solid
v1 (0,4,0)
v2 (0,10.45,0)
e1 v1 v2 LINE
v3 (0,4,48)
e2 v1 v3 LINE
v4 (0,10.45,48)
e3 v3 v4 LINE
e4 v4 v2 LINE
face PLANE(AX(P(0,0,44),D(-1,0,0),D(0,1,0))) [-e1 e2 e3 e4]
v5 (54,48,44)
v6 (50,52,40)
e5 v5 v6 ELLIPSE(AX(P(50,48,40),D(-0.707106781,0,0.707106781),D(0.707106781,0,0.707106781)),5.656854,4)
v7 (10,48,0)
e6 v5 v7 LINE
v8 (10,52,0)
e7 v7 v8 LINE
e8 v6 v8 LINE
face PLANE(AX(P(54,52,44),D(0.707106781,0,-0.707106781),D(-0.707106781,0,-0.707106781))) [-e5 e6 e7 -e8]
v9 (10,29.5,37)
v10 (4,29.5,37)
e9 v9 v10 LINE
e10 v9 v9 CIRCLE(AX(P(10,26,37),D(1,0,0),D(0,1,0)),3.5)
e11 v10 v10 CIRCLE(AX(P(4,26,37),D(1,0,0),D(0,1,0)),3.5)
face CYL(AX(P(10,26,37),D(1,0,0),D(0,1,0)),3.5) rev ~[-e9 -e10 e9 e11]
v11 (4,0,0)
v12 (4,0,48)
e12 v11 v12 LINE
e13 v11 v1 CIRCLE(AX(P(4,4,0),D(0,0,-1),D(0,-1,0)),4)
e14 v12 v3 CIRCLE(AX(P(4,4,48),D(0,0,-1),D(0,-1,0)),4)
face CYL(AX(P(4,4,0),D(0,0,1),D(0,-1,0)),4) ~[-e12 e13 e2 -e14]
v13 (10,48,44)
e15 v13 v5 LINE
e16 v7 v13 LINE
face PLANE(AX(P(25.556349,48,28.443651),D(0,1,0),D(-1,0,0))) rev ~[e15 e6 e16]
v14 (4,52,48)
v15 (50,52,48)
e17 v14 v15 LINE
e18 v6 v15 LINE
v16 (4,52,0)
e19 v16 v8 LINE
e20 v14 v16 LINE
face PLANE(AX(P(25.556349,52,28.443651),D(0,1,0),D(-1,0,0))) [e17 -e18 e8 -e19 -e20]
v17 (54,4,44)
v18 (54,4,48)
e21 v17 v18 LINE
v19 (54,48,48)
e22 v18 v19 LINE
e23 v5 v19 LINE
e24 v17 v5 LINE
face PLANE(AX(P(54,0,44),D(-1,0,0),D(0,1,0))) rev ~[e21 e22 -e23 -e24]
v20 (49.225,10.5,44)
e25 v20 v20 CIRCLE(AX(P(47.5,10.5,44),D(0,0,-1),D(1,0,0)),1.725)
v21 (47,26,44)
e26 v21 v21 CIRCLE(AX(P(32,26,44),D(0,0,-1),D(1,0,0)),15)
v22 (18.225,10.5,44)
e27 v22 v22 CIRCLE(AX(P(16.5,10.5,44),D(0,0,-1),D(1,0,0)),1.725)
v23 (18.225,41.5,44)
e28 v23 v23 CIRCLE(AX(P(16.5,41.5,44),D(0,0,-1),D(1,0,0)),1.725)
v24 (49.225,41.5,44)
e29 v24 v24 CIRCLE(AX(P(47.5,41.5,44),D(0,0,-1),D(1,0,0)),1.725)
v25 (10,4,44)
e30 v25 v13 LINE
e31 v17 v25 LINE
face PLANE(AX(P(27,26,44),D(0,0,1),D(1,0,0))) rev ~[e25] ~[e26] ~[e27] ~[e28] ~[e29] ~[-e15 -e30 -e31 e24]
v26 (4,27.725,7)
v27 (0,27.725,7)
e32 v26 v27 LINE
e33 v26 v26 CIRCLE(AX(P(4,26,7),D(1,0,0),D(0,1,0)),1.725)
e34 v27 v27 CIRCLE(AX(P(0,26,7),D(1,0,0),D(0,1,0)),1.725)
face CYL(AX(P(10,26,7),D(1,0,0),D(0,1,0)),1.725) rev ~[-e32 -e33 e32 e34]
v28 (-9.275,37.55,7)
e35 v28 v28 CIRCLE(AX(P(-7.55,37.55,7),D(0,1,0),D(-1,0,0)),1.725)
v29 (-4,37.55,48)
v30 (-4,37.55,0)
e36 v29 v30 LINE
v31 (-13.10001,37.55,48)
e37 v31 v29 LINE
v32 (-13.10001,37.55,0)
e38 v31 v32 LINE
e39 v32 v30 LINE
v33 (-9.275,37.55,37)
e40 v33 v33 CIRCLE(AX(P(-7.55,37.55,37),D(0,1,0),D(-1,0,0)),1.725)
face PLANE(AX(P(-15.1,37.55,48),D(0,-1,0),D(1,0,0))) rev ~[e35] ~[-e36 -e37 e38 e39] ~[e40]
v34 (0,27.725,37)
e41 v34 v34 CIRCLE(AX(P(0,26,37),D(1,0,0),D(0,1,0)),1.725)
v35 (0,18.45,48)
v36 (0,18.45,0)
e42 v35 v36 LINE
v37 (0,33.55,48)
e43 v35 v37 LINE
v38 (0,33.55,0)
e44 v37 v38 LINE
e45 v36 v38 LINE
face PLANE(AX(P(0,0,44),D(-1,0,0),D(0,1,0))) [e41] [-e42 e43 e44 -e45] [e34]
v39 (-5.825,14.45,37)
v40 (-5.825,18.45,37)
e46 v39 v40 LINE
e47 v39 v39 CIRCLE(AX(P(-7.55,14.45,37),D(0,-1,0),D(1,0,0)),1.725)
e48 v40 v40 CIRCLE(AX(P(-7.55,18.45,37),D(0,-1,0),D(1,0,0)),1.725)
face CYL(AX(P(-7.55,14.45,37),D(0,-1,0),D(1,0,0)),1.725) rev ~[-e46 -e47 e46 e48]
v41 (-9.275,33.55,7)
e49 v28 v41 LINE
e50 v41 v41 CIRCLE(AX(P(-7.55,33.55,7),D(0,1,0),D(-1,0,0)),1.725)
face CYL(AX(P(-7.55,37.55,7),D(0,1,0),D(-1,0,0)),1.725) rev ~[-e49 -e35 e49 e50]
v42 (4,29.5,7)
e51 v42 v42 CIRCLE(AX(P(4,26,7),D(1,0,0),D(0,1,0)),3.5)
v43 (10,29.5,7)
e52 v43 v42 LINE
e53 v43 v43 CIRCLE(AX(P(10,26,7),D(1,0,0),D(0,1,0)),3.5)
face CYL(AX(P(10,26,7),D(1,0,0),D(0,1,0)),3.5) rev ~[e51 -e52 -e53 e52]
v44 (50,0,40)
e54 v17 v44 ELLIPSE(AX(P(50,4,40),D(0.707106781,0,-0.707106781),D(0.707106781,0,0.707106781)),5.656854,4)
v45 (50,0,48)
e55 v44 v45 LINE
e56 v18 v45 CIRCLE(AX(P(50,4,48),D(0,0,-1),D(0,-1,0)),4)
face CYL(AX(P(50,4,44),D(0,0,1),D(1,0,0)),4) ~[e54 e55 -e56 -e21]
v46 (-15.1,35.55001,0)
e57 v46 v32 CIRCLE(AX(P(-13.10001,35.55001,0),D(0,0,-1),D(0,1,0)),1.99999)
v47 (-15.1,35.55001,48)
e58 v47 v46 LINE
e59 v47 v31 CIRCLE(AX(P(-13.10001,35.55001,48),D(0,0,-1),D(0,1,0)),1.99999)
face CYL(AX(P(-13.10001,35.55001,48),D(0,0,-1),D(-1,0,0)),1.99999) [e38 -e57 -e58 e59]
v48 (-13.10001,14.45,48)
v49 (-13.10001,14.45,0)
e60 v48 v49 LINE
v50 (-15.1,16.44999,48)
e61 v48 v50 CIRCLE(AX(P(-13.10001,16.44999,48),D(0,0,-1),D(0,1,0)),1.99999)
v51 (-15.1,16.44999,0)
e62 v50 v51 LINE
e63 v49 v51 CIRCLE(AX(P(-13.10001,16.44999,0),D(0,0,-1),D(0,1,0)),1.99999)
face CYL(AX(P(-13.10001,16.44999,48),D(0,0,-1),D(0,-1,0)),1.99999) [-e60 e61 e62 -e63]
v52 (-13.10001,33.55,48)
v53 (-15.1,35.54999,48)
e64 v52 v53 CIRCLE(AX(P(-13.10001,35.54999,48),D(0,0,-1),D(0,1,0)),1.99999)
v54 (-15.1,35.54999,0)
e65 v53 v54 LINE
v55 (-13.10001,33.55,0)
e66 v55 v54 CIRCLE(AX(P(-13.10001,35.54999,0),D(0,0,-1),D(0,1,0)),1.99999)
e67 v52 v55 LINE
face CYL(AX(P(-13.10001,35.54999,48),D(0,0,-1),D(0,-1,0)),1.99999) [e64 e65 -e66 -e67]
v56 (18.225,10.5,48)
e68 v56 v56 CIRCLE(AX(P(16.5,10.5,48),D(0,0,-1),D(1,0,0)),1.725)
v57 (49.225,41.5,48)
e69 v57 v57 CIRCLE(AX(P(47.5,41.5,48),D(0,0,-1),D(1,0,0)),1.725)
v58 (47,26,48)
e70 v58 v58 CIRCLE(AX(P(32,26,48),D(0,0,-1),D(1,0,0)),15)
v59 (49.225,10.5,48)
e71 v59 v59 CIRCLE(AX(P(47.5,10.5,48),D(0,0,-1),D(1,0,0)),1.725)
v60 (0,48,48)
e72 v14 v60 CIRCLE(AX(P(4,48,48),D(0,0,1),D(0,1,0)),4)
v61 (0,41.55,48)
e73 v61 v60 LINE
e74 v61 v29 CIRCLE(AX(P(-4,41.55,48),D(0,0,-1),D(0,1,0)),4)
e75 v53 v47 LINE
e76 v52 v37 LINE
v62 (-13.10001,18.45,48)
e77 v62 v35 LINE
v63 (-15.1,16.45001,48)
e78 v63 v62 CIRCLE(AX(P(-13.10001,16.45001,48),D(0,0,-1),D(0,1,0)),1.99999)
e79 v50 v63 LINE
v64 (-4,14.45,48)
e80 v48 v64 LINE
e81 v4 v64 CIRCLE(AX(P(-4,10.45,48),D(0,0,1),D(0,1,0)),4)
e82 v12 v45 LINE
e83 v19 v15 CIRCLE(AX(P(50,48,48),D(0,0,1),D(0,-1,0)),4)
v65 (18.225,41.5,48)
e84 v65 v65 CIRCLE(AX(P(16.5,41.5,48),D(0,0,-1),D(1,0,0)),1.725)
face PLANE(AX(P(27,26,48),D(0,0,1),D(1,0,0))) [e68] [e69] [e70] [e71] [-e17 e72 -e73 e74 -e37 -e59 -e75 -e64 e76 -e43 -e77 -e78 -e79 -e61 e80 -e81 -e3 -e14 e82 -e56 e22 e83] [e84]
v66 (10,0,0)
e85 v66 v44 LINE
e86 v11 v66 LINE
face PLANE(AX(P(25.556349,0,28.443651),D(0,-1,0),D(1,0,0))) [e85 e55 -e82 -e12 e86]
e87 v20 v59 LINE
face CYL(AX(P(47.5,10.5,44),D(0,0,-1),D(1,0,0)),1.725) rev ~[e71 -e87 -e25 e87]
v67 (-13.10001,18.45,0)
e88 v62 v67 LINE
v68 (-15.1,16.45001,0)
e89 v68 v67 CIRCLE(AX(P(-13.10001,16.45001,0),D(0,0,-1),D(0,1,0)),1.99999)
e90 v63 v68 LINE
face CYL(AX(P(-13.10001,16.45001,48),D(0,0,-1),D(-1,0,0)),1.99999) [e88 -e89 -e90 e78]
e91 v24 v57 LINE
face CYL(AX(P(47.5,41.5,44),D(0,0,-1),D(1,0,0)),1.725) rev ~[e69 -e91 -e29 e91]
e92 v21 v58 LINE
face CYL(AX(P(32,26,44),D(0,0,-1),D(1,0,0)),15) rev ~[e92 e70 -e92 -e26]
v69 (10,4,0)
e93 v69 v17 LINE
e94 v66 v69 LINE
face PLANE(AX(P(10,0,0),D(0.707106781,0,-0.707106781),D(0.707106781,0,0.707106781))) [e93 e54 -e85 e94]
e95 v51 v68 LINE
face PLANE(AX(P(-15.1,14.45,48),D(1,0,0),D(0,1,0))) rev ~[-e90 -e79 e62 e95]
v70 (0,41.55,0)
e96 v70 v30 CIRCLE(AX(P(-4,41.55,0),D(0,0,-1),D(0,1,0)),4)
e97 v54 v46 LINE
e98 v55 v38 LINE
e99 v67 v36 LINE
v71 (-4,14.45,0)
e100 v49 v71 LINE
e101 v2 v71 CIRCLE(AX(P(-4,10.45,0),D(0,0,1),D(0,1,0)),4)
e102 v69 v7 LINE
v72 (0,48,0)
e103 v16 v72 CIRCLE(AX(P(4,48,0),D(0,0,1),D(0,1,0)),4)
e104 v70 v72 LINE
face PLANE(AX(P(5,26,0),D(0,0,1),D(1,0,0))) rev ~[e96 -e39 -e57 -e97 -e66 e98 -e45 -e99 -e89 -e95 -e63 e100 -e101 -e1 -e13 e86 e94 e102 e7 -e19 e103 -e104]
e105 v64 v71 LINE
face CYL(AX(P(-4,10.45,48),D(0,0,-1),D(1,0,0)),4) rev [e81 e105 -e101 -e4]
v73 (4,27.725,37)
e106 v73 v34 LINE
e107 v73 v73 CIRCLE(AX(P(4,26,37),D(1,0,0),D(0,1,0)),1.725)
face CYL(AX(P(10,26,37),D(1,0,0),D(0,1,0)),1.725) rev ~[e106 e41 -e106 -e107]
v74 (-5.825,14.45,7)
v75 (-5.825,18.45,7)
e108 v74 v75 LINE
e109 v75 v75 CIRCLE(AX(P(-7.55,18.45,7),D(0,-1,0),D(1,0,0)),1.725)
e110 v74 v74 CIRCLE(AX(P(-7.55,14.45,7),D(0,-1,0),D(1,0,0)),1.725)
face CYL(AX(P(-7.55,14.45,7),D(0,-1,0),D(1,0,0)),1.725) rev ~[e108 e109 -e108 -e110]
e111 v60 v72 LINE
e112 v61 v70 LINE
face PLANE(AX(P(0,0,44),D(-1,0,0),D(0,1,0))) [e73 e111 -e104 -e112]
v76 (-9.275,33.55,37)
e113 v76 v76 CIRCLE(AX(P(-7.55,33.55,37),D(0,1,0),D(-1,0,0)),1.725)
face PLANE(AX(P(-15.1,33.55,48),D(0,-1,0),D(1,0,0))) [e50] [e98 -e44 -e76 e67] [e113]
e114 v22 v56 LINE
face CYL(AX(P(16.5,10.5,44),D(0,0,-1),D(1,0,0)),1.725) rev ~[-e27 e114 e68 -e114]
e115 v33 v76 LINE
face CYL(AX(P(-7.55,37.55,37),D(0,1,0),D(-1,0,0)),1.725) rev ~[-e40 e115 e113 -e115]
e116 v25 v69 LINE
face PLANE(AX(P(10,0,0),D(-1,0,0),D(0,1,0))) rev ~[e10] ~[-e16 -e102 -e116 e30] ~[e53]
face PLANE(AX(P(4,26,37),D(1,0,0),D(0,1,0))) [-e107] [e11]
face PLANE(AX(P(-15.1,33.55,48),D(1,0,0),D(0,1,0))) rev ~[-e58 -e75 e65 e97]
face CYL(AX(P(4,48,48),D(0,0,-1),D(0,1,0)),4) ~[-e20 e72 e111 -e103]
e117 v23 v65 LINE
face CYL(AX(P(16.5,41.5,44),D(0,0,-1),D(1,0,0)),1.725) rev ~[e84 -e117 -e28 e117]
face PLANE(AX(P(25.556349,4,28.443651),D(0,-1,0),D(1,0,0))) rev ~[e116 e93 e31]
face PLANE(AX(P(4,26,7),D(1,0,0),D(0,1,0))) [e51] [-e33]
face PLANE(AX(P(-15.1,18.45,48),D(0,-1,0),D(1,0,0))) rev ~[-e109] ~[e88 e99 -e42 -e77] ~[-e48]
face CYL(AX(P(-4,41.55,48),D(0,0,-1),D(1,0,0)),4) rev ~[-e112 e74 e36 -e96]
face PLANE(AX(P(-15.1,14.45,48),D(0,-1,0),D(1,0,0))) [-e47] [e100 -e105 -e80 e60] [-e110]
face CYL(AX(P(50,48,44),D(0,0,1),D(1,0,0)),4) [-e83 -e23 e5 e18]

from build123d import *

# Parameters (mm, degrees)
F0_W      = 10
F0_H      = 52
F1_DEPTH  = 44
F2_W      = 54
F2_H      = 52
F3_DEPTH  = 4
F5_DEPTH  = 4
F7_DEPTH  = 4
F8_R      = 15
F8_R_2    = 1.725
F9_DEPTH  = 4
F10_R     = 1.725
F11_DEPTH = 10
F10_R_2   = 3.5
F12_DEPTH = 6
F14_W     = 15.1
F14_H     = 4
F15_DEPTH = 48
F16_R     = 1.725
F17_DEPTH = 4
F18_R     = 1.725
F19_DEPTH = 4
F20_R     = 4
F21_R     = 1.99999


# Not quite as in the source:
# - a fillet or chamfer is up to 0.001 mm smaller than in the source, because OpenCascade refuses the exact size
# - a feature of the source that left no trace in its solid (it failed there, or was rolled back) is left out
# - a feature names something its author has since deleted; it is built from what else it names


with BuildPart() as f1:
    # F0 (on Top) → F1 (new body)
    with BuildSketch(Plane.XY):
        with Locations((5, 26)):
            Rectangle(F0_W, F0_H)
    extrude(amount=F1_DEPTH)

    # F2 (on face) → F3 (join)
    with BuildSketch(Plane.XY.offset(44)):
        with Locations((27, 26)):
            Rectangle(F2_W, F2_H)
    extrude(amount=F3_DEPTH)

    # F4 (on face) → F5 (join)
    with BuildSketch(Plane.XZ):
        Polygon((10, 0), (54, 44), (10, 44), align=None)
    extrude(amount=-F5_DEPTH)

    # F6 (on face) → F7 (join)
    with BuildSketch(Plane(origin=(0, 52, 0), x_dir=(-1, 0, 0), z_dir=(0, 1, 0))):
        Polygon((-10, 44), (-54, 44), (-10, 0), align=None)
    extrude(amount=-F7_DEPTH)

    # F8 (on face) → F9 (cut, through all)
    with BuildSketch(Plane(origin=(0, 0, 44), x_dir=(1, 0, 0), z_dir=(0, 0, -1))):
        with Locations((32, -26)):
            Circle(F8_R)
        with Locations((16.5, -10.5)):
            Circle(F8_R_2)
        with Locations((47.5, -10.5)):
            Circle(F8_R_2)
        with Locations((47.5, -41.5)):
            Circle(F8_R_2)
        with Locations((16.5, -41.5)):
            Circle(F8_R_2)
    extrude(amount=-F9_DEPTH, mode=Mode.SUBTRACT)

    # F10 (on face) → F11 (cut)
    with BuildSketch(Plane.YZ.offset(10)):
        with Locations((26, 37)):
            Circle(F10_R)
        with Locations((26, 7)):
            Circle(F10_R)
    extrude(amount=-F11_DEPTH, mode=Mode.SUBTRACT)

    # F10 (on face) → F12 (cut)
    with BuildSketch(Plane.YZ.offset(10)):
        with Locations((26, 37)):
            Circle(F10_R_2)
        with Locations((26, 37)):
            Circle(F10_R, mode=Mode.SUBTRACT)
        with Locations((26, 7)):
            Circle(F10_R_2)
        with Locations((26, 7)):
            Circle(F10_R, mode=Mode.SUBTRACT)
    extrude(amount=-F12_DEPTH, mode=Mode.SUBTRACT)

    # F14 (on face) → F15 (join)
    with BuildSketch(Plane.XY.offset(48)):
        with Locations((-7.55, 35.55)):
            Rectangle(F14_W, F14_H)
        with Locations((-7.55, 16.45)):
            Rectangle(F14_W, F14_H)
    extrude(amount=-F15_DEPTH)

    # F16 (on face) → F17 (cut, through all)
    with BuildSketch(Plane.XZ.offset(-14.45)):
        with Locations((-7.55, 37)):
            Circle(F16_R)
        with Locations((-7.55, 7)):
            Circle(F16_R)
    extrude(amount=-F17_DEPTH, mode=Mode.SUBTRACT)

    # F18 (on face) → F19 (cut, through all)
    with BuildSketch(Plane(origin=(0, 37.55, 0), x_dir=(-1, 0, 0), z_dir=(0, 1, 0))):
        with Locations((7.55, 37)):
            Circle(F18_R)
        with Locations((7.55, 7)):
            Circle(F18_R)
    extrude(amount=-F19_DEPTH, mode=Mode.SUBTRACT)

    # F20
    f20_edges = [f1.edges().sort_by_distance(p)[0] for p in [
        (0, 14.45, 24),
        (0, 37.55, 24),
        (0, 52, 24),
        (54, 52, 46),
        (54, 0, 46),
        (0, 0, 24),
    ]]
    fillet(f20_edges, radius=F20_R)

    # F21 (radius 2 in the source; OpenCascade refuses exactly that, so slightly less here)
    f21_edges = [f1.edges().sort_by_distance(p)[0] for p in [
        (-15.1, 37.55, 24),
        (-15.1, 33.55, 24),
        (-15.1, 18.45, 24),
        (-15.1, 14.45, 24),
    ]]
    fillet(f21_edges, radius=F21_R)


solid = f1.part
